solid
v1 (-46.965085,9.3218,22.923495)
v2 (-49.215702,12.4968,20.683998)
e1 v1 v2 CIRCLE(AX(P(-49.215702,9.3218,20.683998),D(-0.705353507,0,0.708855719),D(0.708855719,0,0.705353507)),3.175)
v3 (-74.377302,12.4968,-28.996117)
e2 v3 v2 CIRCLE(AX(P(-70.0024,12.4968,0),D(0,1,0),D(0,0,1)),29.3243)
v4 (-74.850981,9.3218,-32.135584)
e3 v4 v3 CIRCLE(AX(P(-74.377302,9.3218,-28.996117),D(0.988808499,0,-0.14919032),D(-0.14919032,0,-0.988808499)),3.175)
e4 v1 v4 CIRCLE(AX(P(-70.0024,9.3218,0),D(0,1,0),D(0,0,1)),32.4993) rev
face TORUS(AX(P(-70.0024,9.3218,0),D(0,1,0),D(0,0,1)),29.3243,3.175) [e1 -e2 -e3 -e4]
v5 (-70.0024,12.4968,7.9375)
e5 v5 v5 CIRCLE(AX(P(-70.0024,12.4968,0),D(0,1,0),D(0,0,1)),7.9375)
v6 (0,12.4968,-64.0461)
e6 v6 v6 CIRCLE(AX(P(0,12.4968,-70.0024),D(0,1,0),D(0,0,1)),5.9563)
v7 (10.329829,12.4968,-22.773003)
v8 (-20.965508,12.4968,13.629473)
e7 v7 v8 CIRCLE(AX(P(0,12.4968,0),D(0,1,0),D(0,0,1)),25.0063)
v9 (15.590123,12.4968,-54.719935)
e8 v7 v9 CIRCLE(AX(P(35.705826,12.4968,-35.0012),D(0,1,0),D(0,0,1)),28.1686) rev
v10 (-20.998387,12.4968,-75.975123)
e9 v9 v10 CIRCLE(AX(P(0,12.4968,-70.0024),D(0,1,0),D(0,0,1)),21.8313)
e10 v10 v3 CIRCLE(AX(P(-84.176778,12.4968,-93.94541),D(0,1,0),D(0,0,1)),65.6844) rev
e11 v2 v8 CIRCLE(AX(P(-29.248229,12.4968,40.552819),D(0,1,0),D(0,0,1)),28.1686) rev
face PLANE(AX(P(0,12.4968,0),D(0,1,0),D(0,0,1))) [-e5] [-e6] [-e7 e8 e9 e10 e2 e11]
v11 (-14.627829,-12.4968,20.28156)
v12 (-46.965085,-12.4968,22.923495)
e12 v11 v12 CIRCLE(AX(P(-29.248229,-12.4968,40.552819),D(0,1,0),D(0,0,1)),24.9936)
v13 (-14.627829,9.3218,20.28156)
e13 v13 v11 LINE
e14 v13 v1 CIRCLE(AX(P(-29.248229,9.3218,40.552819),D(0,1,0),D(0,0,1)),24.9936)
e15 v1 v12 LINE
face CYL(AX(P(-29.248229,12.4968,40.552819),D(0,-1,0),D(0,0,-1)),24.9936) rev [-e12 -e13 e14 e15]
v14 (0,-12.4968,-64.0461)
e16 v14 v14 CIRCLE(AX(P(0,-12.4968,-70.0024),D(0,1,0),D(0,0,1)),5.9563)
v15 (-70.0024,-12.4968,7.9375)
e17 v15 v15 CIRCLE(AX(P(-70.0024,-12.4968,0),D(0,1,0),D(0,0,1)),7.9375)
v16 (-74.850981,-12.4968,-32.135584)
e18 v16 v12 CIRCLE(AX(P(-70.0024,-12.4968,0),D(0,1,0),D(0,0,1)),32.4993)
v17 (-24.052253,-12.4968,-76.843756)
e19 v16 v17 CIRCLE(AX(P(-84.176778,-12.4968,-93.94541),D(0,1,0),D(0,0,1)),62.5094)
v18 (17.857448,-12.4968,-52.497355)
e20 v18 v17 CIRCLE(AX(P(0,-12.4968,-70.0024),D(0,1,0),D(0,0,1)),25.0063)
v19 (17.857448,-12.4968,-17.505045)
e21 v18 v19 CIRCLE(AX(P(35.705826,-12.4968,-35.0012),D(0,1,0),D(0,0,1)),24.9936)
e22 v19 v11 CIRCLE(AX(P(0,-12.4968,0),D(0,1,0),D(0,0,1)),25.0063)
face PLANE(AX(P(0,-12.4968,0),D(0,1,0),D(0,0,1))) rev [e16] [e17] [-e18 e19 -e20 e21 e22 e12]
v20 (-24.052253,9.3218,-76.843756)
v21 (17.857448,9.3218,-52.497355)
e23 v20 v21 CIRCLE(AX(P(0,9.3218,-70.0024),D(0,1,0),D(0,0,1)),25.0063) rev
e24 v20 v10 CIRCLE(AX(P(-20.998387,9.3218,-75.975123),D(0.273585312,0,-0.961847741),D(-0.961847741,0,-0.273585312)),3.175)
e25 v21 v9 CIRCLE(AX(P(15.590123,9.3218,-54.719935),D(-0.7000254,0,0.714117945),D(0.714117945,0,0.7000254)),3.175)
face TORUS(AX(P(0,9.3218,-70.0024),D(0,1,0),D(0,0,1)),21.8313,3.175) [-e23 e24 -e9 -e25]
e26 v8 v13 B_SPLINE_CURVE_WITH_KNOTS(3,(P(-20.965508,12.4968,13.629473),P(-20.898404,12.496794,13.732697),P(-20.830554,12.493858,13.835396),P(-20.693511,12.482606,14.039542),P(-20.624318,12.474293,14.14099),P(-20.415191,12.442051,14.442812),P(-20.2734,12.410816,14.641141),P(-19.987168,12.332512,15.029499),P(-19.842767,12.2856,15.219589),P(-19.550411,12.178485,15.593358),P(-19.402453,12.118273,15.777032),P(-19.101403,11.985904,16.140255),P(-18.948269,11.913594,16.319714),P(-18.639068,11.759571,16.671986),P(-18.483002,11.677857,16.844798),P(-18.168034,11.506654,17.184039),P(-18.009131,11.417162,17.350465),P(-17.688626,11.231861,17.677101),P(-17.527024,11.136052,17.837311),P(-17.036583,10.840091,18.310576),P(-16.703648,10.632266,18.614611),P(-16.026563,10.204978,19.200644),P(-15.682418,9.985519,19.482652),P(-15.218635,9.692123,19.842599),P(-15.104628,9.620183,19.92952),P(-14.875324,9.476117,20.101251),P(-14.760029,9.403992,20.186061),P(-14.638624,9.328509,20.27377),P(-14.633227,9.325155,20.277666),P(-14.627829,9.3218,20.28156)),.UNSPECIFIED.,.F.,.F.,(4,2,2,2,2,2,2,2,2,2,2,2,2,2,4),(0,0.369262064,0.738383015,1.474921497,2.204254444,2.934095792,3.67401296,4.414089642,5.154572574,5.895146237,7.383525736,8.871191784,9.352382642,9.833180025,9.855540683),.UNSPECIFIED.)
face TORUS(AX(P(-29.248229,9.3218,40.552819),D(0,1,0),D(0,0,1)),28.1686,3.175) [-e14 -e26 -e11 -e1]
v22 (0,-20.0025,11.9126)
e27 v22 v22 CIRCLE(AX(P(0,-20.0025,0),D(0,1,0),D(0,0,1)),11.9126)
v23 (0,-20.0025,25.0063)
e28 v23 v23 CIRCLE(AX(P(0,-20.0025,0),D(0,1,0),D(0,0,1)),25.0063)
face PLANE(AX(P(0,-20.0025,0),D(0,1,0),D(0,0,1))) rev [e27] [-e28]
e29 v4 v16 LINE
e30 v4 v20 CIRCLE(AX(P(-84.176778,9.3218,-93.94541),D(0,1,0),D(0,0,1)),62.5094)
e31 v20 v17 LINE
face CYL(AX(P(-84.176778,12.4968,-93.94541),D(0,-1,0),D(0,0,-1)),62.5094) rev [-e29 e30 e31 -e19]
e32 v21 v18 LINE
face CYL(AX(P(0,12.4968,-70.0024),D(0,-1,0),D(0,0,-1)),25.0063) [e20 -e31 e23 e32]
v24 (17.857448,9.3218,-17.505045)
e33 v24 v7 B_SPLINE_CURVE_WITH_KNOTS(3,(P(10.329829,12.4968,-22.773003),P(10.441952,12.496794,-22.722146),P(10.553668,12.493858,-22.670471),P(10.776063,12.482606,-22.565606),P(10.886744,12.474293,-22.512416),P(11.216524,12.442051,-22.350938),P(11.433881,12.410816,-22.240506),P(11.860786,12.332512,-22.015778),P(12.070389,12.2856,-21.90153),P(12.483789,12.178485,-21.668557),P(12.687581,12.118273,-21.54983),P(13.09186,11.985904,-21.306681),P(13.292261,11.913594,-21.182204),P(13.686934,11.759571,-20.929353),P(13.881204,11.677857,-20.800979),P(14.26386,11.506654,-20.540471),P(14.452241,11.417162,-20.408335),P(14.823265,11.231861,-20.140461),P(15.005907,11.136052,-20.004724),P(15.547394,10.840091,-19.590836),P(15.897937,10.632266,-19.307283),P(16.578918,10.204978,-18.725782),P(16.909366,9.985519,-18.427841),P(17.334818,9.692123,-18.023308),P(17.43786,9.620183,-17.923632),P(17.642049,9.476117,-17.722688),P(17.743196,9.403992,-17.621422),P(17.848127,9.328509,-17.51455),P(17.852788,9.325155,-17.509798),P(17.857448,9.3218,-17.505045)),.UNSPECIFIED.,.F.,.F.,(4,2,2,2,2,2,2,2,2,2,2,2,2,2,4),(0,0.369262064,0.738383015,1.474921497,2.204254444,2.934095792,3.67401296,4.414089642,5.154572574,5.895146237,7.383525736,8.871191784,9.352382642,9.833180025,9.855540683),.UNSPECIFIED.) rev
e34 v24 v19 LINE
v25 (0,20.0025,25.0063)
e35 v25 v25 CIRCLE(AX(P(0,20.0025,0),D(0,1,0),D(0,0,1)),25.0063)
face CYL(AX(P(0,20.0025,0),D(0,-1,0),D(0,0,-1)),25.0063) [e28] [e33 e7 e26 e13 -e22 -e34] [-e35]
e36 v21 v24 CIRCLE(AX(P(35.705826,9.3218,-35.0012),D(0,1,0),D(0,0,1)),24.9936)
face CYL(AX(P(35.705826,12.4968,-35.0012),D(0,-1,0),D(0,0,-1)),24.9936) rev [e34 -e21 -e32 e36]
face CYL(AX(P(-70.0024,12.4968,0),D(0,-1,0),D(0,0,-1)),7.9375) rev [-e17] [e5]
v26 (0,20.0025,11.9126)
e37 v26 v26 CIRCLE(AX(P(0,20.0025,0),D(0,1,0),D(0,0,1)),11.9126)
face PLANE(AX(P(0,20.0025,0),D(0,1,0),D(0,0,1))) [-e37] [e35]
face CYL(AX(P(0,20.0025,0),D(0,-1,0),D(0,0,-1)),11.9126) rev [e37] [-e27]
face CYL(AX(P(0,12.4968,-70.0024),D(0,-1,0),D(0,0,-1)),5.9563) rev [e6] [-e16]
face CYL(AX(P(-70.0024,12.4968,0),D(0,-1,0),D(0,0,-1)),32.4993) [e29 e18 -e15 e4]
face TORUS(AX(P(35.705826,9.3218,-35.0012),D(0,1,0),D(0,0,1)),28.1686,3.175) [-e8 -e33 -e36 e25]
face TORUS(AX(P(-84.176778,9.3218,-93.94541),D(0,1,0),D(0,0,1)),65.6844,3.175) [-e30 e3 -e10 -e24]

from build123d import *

# Parameters (mm, degrees)
SKETCH2_R           = 25.0063
SKETCH2_R_2         = 11.9126
BOSS_EXTRUDE2_DEPTH = 20.0025
SKETCH2_3_R         = 7.9375
SKETCH2_3_R_2       = 5.9563
BOSS_EXTRUDE3_DEPTH = 12.4968
FILLET1_R           = 3.175


with BuildPart() as part:
    # Sketch2 → Boss-Extrude2 (new, symmetric)
    with BuildSketch(Plane(origin=(0, 0, 0), x_dir=(1, 0, 0), z_dir=(0, 1, 0))):
        with Locations(Location((0, 0, 0), (0, 0, 270))):
            Circle(SKETCH2_R)
        with Locations(Location((0, 0, 0), (0, 0, 270))):
            Circle(SKETCH2_R_2, mode=Mode.SUBTRACT)
    extrude(amount=BOSS_EXTRUDE2_DEPTH, both=True)

    # Sketch2<3> → Boss-Extrude3 (add, symmetric)
    with BuildSketch(Plane(origin=(0, 0, 0), x_dir=(1, 0, 0), z_dir=(0, 1, 0))):
        with BuildLine():
            ThreePointArc((-14.627829046, -20.281559533), (-18.962185595, 16.301857476), (17.857447567, 17.505045161))
            ThreePointArc((17.857447567, 17.505045161), (10.712225835, 35.0012), (17.857447567, 52.497354839))
            ThreePointArc((17.857447567, 52.497354839), (12.561079617, 91.624941907), (-24.05225317, 76.843756383))
            ThreePointArc((-24.05225317, 76.843756383), (-42.87857023, 47.021182923), (-74.850980968, 32.135584063))
            ThreePointArc((-74.850980968, 32.135584063), (-98.995210512, -14.684053906), (-46.965085328, -22.923495222))
            ThreePointArc((-46.965085328, -22.923495222), (-31.283411202, -15.642216981), (-14.627829046, -20.281559533))
        make_face()
        with Locations(Location((-70.0024, 0, 0), (0, 0, 270))):
            Circle(SKETCH2_3_R, mode=Mode.SUBTRACT)
        with Locations(Location((0, 70.0024, 0), (0, 0, 270))):
            Circle(SKETCH2_3_R_2, mode=Mode.SUBTRACT)
    extrude(amount=BOSS_EXTRUDE3_DEPTH, both=True)

    # Fillet1
    # the kernel refuses this fillet: 3.175 mm, written as the material it takes off along each edge
    with BuildSketch(Plane(origin=(-84.17677836, 12.4968, -93.945410073), x_dir=(0.9618477411525731, 0, 0.2735853118127743), z_dir=(0.2735853118127743, 0, -0.9618477411525731))) as fillet1_piece_1:
        with BuildLine():
            CenterArc((62.5094 + FILLET1_R, FILLET1_R), FILLET1_R, 180, 90)
            Line((62.5094, FILLET1_R), (62.5094, 0))
            Line((62.5094, 0), (62.5094 + FILLET1_R, 0))
        make_face()
    revolve(axis=Axis((-84.17677836, 12.4968, -93.945410073), (0, -1, 0)), revolution_arc=65.542266938, mode=Mode.SUBTRACT)
    with BuildSketch(Plane(origin=(-29.248229028, 12.4968, 40.552818629), x_dir=(-0.7088557190961631, 0, -0.705353506764276), z_dir=(-0.705353506764276, 0, 0.7088557190961631))) as fillet1_piece_2_section:
        with BuildLine():
            CenterArc((24.9936 + FILLET1_R, FILLET1_R), FILLET1_R, 180, 90)
            Line((24.9936 + FILLET1_R, 0), (24.9936, 0))
            Line((24.9936, 0), (24.9936, FILLET1_R))
        make_face()
    fillet1_piece_2 = revolve(axis=Axis((-29.248229028, 12.4968, 40.552818629), (0, -1, 0)), revolution_arc=99.144440238, mode=Mode.PRIVATE)
    fillet1_piece_2 = fillet1_piece_2 - Plane(origin=(0, 11.594758581, 0), x_dir=(0, 0, 1), z_dir=(0, 1, 0)) * Cylinder(25.0063, 113, mode=Mode.PRIVATE)
    add(fillet1_piece_2, mode=Mode.SUBTRACT)
    with BuildSketch(Plane(origin=(35.705825835, 12.4968, -35.0012), x_dir=(-0.45970021745025064, 0, 0.8880741579824245), z_dir=(0.8880741579824245, 0, 0.45970021745025064))) as fillet1_piece_3_section:
        with BuildLine():
            CenterArc((24.9936 + FILLET1_R, FILLET1_R), FILLET1_R, 180, 90)
            Line((24.9936, FILLET1_R), (24.9936, 0))
            Line((24.9936, 0), (24.9936 + FILLET1_R, 0))
        make_face()
    fillet1_piece_3 = revolve(axis=Axis((35.705825835, 12.4968, -35.0012), (0, -1, 0)), revolution_arc=107.06127711, mode=Mode.PRIVATE)
    fillet1_piece_3 = fillet1_piece_3 - Plane(origin=(0, 11.595953035, 0), x_dir=(0, 0, 1), z_dir=(0, 1, 0)) * Cylinder(25.0063, 113, mode=Mode.PRIVATE)
    add(fillet1_piece_3, mode=Mode.SUBTRACT)
    with BuildSketch(Plane(origin=(-70.0024, 12.4968, 0), x_dir=(-0.1491903200484399, 0, -0.9888084993586191), z_dir=(0.9888084993586191, 0, -0.1491903200484399))) as fillet1_piece_4:
        with BuildLine():
            CenterArc((32.4993 - FILLET1_R, -FILLET1_R), FILLET1_R, 0, 90)
            Line((32.4993, -FILLET1_R), (32.4993, 0))
            Line((32.4993, 0), (32.4993 - FILLET1_R, 0))
        make_face()
    revolve(axis=Axis((-70.0024, 12.4968, 0), (0, 1, 0)), revolution_arc=216.561882249, mode=Mode.SUBTRACT)
    with BuildSketch(Plane(origin=(0, 12.4968, -70.0024), x_dir=(0.7141179449388714, 0, 0.7000254000508005), z_dir=(-0.7000254000508005, 0, 0.7141179449388714))) as fillet1_piece_5:
        with BuildLine():
            CenterArc((25.0063 - FILLET1_R, -FILLET1_R), FILLET1_R, 0, 90)
            Line((25.0063, -FILLET1_R), (25.0063, 0))
            Line((25.0063, 0), (25.0063 - FILLET1_R, 0))
        make_face()
    revolve(axis=Axis((0, 12.4968, -70.0024), (0, 1, 0)), revolution_arc=208.551316171, mode=Mode.SUBTRACT)


solid = part.part
